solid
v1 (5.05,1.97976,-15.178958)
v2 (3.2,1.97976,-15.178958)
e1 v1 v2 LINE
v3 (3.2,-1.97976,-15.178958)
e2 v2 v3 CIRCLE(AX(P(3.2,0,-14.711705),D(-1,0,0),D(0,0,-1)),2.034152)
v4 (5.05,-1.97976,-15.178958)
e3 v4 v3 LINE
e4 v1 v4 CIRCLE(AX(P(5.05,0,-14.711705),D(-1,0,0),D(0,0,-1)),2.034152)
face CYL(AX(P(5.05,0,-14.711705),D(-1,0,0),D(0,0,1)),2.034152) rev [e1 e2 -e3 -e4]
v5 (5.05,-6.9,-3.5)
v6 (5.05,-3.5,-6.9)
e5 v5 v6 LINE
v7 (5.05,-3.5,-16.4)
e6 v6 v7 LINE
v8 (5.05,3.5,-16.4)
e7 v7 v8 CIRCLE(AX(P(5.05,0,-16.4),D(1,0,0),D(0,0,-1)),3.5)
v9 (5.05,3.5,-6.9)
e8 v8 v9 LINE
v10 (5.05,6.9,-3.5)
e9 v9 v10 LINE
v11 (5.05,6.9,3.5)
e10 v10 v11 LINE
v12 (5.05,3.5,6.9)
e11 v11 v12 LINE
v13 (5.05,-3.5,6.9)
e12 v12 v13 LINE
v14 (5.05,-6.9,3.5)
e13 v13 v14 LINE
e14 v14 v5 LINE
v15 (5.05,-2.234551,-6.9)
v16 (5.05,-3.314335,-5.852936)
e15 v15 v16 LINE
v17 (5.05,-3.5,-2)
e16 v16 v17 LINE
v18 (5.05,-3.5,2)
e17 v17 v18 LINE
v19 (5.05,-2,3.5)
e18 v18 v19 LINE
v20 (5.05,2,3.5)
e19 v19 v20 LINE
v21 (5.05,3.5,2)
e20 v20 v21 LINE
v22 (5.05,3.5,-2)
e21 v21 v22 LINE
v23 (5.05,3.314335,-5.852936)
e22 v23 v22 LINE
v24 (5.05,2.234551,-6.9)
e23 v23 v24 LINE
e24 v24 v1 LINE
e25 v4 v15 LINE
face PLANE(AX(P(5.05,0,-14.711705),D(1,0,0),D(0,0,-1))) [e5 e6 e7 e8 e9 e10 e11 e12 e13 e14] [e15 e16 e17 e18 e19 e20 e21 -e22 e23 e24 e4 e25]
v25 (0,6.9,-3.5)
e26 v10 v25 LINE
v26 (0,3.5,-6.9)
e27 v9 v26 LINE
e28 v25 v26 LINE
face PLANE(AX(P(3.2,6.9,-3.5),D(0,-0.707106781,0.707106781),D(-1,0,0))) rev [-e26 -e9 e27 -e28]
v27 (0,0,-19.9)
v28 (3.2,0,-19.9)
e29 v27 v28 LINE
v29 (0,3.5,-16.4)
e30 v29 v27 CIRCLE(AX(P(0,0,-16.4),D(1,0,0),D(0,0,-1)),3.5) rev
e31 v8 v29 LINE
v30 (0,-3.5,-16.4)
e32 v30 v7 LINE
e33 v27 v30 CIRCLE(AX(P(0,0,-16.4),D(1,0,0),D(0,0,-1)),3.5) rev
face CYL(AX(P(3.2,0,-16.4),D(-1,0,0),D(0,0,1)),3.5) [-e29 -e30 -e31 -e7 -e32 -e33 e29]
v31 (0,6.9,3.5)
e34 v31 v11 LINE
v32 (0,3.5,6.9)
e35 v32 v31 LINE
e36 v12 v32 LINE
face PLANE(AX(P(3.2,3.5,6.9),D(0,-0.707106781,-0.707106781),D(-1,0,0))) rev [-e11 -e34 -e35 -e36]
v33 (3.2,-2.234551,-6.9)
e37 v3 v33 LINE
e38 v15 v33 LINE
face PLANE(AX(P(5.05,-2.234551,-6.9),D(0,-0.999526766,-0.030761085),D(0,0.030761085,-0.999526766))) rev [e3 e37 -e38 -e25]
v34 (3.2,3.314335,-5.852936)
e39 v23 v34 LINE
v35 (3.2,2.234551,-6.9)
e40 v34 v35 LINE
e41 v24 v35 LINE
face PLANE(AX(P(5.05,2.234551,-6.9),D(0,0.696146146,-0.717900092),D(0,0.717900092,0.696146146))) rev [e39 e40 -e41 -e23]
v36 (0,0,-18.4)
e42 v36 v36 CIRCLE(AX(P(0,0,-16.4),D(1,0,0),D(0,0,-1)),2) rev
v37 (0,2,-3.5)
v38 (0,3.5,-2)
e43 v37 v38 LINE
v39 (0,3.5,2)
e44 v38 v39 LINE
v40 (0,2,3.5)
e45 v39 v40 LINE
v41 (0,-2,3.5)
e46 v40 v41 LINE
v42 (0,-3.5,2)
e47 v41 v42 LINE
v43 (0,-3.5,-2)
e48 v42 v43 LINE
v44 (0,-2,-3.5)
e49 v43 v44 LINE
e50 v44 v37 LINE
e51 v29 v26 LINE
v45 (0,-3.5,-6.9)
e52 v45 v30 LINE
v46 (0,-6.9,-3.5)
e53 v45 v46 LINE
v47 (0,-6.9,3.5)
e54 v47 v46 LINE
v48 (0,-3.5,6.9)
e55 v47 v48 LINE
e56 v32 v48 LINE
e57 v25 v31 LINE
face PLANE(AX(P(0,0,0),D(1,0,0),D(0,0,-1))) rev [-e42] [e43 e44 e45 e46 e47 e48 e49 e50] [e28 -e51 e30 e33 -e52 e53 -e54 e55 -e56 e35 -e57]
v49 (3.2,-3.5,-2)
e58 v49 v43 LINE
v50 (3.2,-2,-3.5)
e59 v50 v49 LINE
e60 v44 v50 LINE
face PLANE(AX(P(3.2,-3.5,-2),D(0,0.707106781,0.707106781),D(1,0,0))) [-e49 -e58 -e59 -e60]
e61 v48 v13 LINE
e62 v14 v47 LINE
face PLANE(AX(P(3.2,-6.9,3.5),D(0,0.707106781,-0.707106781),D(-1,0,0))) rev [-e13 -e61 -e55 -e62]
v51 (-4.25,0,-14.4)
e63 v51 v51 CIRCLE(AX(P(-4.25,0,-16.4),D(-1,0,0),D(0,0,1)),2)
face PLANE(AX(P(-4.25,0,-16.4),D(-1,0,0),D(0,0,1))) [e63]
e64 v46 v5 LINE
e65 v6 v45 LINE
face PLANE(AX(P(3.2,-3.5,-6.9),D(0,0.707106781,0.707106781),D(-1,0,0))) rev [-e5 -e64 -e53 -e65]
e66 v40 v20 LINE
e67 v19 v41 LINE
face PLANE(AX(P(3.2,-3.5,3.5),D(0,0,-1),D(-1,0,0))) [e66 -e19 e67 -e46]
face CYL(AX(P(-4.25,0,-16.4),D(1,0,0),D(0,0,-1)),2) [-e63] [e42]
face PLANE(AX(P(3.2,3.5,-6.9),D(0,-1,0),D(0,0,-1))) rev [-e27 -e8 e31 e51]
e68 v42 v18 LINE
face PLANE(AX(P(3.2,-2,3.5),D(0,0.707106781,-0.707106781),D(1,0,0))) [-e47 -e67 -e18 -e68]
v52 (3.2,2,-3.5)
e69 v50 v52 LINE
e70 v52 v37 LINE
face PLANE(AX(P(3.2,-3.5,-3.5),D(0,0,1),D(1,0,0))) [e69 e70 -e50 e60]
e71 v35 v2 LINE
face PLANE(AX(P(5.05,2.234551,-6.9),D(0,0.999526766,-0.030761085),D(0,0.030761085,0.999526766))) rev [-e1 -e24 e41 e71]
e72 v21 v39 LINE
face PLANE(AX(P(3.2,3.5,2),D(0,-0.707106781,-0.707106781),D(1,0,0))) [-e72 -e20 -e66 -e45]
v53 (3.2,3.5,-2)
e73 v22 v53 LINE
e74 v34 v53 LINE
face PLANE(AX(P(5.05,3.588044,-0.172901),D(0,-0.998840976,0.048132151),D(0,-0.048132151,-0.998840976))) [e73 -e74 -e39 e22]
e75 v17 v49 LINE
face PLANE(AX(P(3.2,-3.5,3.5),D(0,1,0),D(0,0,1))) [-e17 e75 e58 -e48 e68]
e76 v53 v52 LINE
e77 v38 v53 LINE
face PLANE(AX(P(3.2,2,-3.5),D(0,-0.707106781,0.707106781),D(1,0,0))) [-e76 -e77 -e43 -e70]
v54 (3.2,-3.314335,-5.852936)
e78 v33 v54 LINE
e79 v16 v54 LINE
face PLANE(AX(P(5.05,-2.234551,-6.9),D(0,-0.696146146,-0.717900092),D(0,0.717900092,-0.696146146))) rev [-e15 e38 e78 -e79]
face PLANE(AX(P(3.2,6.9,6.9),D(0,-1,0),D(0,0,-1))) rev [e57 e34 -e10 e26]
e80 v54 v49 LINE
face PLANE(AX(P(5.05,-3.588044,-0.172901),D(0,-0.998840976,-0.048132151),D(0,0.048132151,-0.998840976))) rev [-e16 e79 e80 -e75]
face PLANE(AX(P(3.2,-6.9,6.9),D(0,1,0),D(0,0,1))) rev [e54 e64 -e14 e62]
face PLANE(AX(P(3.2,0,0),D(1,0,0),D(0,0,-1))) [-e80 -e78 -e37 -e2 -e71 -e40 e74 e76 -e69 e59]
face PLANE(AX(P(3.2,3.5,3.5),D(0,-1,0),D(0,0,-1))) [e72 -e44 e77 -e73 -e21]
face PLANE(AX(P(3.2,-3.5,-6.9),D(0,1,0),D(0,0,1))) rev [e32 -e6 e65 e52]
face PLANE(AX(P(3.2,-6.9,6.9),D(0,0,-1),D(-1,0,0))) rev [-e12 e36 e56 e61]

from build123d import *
from build123d.topology import SkipClean

# Parameters (mm, degrees)
SKETCH1_W           = 7
SKETCH1_H           = 7
BOSS_EXTRUDE1_DEPTH = 3.2
CHAMFER1_SIZE       = 1.5
FILLET1_R           = 3.5
CHAMFER2_SIZE       = 3.4
SKETCH3_R           = 2
BOSS_EXTRUDE2_DEPTH = 4.25
BOSS_EXTRUDE3_DEPTH = 1.85
BOSS_EXTRUDE4_DEPTH = 1.85


with BuildPart() as part:
    # Sketch1 → Boss-Extrude1 (new body)
    with BuildSketch(Plane(origin=(0, 0, 0), x_dir=(0, 0, -1), z_dir=(1, 0, 0))):
        Polygon((6.9, 3.5), (6.9, 6.9), (-6.9, 6.9), (-6.9, -6.9), (6.9, -6.9), (6.9, -3.5), (19.9, -3.5), (19.9, 3.5), align=None)
        Rectangle(SKETCH1_W, SKETCH1_H, mode=Mode.SUBTRACT)
    extrude(amount=BOSS_EXTRUDE1_DEPTH)

    # Chamfer1
    chamfer1_edges = [part.edges().sort_by_distance(p)[0] for p in [
        (1.6, -3.5, -3.5),
        (1.6, 3.5, -3.5),
        (1.6, 3.5, 3.5),
        (1.6, -3.5, 3.5),
    ]]
    chamfer(chamfer1_edges, length=CHAMFER1_SIZE)

    # Fillet1
    fillet1_edges = [part.edges().sort_by_distance(p)[0] for p in [
        (1.6, -3.5, -19.9),
        (1.6, 3.5, -19.9),
    ]]
    fillet(fillet1_edges, radius=FILLET1_R - 0.0001)  # a hair under: the kernel refuses the full size

    # Chamfer2
    chamfer2_edges = [part.edges().sort_by_distance(p)[0] for p in [
        (1.6, -6.9, -6.9),
        (1.6, -6.9, 6.9),
        (1.6, 6.9, 6.9),
        (1.6, 6.9, -6.9),
    ]]
    chamfer(chamfer2_edges, length=CHAMFER2_SIZE - 0.0001)  # a hair under: the kernel refuses the full size

    # Sketch3 → Boss-Extrude2 (add)
    with BuildSketch(Plane.ZY):
        with Locations(Location((-16.4, 0, 0), (0, 0, 180))):
            Circle(SKETCH3_R)
    extrude(amount=BOSS_EXTRUDE2_DEPTH)

    # Sketch4 → Boss-Extrude3 (add)
    with BuildSketch(Plane(origin=(3.2, 0, 0), x_dir=(0, 0, -1), z_dir=(1, 0, 0))):
        with BuildLine():
            Line((6.9, 2.234550653), (15.178957615, 1.979760355))
            ThreePointArc((15.178957615, 1.979760355), (16.745857217, 0), (15.178957615, -1.979760355))
            Line((15.178957615, -1.979760355), (6.9, -2.234550653))
            Line((6.9, -2.234550653), (5.852935753, -3.314334724))
            Line((5.852935753, -3.314334724), (15.305699084, -3.023419792))
            ThreePointArc((15.305699084, -3.023419792), (17.792921464, 0), (15.305699084, 3.023419792))
            Line((15.305699084, 3.023419792), (5.852935753, 3.314334724))
            Line((5.852935753, 3.314334724), (6.9, 2.234550653))
        make_face()
    extrude(amount=BOSS_EXTRUDE3_DEPTH)

    # Sketch5 → Boss-Extrude4 (add)
    with SkipClean():  # the faces are left unmerged after this step: merging them gives an invalid solid
        with BuildSketch(Plane(origin=(3.2, 0, 0), x_dir=(0, 0, -1), z_dir=(1, 0, 0))):
            with BuildLine():
                Line((-6.9, -3.5), (-3.5, -6.9))
                Line((-3.5, -6.9), (3.5, -6.9))
                Line((3.5, -6.9), (6.9, -3.5))
                Line((6.9, -3.5), (16.4, -3.5))
                ThreePointArc((16.4, -3.5), (18.874873734, -2.474873734), (19.9, 0))
                ThreePointArc((19.9, 0), (18.874873734, 2.474873734), (16.4, 3.5))
                Line((16.4, 3.5), (6.9, 3.5))
                Line((6.9, 3.5), (3.5, 6.9))
                Line((3.5, 6.9), (-3.5, 6.9))
                Line((-3.5, 6.9), (-6.9, 3.5))
                Line((-6.9, 3.5), (-6.9, -3.5))
            make_face()
            with BuildLine():
                Line((5.852935753, -3.314334724), (2, -3.5))
                Line((2, -3.5), (-2, -3.5))
                Line((-2, -3.5), (-3.5, -2))
                Line((-3.5, -2), (-3.5, 2))
                Line((-3.5, 2), (-2, 3.5))
                Line((-2, 3.5), (2, 3.5))
                Line((2, 3.5), (5.852935753, 3.314334724))
                Line((5.852935753, 3.314334724), (15.305699084, 3.023419792))
                ThreePointArc((15.305699084, 3.023419792), (17.792921464, 0), (15.305699084, -3.023419792))
                Line((15.305699084, -3.023419792), (5.852935753, -3.314334724))
            make_face(mode=Mode.SUBTRACT)
        extrude(amount=BOSS_EXTRUDE4_DEPTH)


solid = part.part
